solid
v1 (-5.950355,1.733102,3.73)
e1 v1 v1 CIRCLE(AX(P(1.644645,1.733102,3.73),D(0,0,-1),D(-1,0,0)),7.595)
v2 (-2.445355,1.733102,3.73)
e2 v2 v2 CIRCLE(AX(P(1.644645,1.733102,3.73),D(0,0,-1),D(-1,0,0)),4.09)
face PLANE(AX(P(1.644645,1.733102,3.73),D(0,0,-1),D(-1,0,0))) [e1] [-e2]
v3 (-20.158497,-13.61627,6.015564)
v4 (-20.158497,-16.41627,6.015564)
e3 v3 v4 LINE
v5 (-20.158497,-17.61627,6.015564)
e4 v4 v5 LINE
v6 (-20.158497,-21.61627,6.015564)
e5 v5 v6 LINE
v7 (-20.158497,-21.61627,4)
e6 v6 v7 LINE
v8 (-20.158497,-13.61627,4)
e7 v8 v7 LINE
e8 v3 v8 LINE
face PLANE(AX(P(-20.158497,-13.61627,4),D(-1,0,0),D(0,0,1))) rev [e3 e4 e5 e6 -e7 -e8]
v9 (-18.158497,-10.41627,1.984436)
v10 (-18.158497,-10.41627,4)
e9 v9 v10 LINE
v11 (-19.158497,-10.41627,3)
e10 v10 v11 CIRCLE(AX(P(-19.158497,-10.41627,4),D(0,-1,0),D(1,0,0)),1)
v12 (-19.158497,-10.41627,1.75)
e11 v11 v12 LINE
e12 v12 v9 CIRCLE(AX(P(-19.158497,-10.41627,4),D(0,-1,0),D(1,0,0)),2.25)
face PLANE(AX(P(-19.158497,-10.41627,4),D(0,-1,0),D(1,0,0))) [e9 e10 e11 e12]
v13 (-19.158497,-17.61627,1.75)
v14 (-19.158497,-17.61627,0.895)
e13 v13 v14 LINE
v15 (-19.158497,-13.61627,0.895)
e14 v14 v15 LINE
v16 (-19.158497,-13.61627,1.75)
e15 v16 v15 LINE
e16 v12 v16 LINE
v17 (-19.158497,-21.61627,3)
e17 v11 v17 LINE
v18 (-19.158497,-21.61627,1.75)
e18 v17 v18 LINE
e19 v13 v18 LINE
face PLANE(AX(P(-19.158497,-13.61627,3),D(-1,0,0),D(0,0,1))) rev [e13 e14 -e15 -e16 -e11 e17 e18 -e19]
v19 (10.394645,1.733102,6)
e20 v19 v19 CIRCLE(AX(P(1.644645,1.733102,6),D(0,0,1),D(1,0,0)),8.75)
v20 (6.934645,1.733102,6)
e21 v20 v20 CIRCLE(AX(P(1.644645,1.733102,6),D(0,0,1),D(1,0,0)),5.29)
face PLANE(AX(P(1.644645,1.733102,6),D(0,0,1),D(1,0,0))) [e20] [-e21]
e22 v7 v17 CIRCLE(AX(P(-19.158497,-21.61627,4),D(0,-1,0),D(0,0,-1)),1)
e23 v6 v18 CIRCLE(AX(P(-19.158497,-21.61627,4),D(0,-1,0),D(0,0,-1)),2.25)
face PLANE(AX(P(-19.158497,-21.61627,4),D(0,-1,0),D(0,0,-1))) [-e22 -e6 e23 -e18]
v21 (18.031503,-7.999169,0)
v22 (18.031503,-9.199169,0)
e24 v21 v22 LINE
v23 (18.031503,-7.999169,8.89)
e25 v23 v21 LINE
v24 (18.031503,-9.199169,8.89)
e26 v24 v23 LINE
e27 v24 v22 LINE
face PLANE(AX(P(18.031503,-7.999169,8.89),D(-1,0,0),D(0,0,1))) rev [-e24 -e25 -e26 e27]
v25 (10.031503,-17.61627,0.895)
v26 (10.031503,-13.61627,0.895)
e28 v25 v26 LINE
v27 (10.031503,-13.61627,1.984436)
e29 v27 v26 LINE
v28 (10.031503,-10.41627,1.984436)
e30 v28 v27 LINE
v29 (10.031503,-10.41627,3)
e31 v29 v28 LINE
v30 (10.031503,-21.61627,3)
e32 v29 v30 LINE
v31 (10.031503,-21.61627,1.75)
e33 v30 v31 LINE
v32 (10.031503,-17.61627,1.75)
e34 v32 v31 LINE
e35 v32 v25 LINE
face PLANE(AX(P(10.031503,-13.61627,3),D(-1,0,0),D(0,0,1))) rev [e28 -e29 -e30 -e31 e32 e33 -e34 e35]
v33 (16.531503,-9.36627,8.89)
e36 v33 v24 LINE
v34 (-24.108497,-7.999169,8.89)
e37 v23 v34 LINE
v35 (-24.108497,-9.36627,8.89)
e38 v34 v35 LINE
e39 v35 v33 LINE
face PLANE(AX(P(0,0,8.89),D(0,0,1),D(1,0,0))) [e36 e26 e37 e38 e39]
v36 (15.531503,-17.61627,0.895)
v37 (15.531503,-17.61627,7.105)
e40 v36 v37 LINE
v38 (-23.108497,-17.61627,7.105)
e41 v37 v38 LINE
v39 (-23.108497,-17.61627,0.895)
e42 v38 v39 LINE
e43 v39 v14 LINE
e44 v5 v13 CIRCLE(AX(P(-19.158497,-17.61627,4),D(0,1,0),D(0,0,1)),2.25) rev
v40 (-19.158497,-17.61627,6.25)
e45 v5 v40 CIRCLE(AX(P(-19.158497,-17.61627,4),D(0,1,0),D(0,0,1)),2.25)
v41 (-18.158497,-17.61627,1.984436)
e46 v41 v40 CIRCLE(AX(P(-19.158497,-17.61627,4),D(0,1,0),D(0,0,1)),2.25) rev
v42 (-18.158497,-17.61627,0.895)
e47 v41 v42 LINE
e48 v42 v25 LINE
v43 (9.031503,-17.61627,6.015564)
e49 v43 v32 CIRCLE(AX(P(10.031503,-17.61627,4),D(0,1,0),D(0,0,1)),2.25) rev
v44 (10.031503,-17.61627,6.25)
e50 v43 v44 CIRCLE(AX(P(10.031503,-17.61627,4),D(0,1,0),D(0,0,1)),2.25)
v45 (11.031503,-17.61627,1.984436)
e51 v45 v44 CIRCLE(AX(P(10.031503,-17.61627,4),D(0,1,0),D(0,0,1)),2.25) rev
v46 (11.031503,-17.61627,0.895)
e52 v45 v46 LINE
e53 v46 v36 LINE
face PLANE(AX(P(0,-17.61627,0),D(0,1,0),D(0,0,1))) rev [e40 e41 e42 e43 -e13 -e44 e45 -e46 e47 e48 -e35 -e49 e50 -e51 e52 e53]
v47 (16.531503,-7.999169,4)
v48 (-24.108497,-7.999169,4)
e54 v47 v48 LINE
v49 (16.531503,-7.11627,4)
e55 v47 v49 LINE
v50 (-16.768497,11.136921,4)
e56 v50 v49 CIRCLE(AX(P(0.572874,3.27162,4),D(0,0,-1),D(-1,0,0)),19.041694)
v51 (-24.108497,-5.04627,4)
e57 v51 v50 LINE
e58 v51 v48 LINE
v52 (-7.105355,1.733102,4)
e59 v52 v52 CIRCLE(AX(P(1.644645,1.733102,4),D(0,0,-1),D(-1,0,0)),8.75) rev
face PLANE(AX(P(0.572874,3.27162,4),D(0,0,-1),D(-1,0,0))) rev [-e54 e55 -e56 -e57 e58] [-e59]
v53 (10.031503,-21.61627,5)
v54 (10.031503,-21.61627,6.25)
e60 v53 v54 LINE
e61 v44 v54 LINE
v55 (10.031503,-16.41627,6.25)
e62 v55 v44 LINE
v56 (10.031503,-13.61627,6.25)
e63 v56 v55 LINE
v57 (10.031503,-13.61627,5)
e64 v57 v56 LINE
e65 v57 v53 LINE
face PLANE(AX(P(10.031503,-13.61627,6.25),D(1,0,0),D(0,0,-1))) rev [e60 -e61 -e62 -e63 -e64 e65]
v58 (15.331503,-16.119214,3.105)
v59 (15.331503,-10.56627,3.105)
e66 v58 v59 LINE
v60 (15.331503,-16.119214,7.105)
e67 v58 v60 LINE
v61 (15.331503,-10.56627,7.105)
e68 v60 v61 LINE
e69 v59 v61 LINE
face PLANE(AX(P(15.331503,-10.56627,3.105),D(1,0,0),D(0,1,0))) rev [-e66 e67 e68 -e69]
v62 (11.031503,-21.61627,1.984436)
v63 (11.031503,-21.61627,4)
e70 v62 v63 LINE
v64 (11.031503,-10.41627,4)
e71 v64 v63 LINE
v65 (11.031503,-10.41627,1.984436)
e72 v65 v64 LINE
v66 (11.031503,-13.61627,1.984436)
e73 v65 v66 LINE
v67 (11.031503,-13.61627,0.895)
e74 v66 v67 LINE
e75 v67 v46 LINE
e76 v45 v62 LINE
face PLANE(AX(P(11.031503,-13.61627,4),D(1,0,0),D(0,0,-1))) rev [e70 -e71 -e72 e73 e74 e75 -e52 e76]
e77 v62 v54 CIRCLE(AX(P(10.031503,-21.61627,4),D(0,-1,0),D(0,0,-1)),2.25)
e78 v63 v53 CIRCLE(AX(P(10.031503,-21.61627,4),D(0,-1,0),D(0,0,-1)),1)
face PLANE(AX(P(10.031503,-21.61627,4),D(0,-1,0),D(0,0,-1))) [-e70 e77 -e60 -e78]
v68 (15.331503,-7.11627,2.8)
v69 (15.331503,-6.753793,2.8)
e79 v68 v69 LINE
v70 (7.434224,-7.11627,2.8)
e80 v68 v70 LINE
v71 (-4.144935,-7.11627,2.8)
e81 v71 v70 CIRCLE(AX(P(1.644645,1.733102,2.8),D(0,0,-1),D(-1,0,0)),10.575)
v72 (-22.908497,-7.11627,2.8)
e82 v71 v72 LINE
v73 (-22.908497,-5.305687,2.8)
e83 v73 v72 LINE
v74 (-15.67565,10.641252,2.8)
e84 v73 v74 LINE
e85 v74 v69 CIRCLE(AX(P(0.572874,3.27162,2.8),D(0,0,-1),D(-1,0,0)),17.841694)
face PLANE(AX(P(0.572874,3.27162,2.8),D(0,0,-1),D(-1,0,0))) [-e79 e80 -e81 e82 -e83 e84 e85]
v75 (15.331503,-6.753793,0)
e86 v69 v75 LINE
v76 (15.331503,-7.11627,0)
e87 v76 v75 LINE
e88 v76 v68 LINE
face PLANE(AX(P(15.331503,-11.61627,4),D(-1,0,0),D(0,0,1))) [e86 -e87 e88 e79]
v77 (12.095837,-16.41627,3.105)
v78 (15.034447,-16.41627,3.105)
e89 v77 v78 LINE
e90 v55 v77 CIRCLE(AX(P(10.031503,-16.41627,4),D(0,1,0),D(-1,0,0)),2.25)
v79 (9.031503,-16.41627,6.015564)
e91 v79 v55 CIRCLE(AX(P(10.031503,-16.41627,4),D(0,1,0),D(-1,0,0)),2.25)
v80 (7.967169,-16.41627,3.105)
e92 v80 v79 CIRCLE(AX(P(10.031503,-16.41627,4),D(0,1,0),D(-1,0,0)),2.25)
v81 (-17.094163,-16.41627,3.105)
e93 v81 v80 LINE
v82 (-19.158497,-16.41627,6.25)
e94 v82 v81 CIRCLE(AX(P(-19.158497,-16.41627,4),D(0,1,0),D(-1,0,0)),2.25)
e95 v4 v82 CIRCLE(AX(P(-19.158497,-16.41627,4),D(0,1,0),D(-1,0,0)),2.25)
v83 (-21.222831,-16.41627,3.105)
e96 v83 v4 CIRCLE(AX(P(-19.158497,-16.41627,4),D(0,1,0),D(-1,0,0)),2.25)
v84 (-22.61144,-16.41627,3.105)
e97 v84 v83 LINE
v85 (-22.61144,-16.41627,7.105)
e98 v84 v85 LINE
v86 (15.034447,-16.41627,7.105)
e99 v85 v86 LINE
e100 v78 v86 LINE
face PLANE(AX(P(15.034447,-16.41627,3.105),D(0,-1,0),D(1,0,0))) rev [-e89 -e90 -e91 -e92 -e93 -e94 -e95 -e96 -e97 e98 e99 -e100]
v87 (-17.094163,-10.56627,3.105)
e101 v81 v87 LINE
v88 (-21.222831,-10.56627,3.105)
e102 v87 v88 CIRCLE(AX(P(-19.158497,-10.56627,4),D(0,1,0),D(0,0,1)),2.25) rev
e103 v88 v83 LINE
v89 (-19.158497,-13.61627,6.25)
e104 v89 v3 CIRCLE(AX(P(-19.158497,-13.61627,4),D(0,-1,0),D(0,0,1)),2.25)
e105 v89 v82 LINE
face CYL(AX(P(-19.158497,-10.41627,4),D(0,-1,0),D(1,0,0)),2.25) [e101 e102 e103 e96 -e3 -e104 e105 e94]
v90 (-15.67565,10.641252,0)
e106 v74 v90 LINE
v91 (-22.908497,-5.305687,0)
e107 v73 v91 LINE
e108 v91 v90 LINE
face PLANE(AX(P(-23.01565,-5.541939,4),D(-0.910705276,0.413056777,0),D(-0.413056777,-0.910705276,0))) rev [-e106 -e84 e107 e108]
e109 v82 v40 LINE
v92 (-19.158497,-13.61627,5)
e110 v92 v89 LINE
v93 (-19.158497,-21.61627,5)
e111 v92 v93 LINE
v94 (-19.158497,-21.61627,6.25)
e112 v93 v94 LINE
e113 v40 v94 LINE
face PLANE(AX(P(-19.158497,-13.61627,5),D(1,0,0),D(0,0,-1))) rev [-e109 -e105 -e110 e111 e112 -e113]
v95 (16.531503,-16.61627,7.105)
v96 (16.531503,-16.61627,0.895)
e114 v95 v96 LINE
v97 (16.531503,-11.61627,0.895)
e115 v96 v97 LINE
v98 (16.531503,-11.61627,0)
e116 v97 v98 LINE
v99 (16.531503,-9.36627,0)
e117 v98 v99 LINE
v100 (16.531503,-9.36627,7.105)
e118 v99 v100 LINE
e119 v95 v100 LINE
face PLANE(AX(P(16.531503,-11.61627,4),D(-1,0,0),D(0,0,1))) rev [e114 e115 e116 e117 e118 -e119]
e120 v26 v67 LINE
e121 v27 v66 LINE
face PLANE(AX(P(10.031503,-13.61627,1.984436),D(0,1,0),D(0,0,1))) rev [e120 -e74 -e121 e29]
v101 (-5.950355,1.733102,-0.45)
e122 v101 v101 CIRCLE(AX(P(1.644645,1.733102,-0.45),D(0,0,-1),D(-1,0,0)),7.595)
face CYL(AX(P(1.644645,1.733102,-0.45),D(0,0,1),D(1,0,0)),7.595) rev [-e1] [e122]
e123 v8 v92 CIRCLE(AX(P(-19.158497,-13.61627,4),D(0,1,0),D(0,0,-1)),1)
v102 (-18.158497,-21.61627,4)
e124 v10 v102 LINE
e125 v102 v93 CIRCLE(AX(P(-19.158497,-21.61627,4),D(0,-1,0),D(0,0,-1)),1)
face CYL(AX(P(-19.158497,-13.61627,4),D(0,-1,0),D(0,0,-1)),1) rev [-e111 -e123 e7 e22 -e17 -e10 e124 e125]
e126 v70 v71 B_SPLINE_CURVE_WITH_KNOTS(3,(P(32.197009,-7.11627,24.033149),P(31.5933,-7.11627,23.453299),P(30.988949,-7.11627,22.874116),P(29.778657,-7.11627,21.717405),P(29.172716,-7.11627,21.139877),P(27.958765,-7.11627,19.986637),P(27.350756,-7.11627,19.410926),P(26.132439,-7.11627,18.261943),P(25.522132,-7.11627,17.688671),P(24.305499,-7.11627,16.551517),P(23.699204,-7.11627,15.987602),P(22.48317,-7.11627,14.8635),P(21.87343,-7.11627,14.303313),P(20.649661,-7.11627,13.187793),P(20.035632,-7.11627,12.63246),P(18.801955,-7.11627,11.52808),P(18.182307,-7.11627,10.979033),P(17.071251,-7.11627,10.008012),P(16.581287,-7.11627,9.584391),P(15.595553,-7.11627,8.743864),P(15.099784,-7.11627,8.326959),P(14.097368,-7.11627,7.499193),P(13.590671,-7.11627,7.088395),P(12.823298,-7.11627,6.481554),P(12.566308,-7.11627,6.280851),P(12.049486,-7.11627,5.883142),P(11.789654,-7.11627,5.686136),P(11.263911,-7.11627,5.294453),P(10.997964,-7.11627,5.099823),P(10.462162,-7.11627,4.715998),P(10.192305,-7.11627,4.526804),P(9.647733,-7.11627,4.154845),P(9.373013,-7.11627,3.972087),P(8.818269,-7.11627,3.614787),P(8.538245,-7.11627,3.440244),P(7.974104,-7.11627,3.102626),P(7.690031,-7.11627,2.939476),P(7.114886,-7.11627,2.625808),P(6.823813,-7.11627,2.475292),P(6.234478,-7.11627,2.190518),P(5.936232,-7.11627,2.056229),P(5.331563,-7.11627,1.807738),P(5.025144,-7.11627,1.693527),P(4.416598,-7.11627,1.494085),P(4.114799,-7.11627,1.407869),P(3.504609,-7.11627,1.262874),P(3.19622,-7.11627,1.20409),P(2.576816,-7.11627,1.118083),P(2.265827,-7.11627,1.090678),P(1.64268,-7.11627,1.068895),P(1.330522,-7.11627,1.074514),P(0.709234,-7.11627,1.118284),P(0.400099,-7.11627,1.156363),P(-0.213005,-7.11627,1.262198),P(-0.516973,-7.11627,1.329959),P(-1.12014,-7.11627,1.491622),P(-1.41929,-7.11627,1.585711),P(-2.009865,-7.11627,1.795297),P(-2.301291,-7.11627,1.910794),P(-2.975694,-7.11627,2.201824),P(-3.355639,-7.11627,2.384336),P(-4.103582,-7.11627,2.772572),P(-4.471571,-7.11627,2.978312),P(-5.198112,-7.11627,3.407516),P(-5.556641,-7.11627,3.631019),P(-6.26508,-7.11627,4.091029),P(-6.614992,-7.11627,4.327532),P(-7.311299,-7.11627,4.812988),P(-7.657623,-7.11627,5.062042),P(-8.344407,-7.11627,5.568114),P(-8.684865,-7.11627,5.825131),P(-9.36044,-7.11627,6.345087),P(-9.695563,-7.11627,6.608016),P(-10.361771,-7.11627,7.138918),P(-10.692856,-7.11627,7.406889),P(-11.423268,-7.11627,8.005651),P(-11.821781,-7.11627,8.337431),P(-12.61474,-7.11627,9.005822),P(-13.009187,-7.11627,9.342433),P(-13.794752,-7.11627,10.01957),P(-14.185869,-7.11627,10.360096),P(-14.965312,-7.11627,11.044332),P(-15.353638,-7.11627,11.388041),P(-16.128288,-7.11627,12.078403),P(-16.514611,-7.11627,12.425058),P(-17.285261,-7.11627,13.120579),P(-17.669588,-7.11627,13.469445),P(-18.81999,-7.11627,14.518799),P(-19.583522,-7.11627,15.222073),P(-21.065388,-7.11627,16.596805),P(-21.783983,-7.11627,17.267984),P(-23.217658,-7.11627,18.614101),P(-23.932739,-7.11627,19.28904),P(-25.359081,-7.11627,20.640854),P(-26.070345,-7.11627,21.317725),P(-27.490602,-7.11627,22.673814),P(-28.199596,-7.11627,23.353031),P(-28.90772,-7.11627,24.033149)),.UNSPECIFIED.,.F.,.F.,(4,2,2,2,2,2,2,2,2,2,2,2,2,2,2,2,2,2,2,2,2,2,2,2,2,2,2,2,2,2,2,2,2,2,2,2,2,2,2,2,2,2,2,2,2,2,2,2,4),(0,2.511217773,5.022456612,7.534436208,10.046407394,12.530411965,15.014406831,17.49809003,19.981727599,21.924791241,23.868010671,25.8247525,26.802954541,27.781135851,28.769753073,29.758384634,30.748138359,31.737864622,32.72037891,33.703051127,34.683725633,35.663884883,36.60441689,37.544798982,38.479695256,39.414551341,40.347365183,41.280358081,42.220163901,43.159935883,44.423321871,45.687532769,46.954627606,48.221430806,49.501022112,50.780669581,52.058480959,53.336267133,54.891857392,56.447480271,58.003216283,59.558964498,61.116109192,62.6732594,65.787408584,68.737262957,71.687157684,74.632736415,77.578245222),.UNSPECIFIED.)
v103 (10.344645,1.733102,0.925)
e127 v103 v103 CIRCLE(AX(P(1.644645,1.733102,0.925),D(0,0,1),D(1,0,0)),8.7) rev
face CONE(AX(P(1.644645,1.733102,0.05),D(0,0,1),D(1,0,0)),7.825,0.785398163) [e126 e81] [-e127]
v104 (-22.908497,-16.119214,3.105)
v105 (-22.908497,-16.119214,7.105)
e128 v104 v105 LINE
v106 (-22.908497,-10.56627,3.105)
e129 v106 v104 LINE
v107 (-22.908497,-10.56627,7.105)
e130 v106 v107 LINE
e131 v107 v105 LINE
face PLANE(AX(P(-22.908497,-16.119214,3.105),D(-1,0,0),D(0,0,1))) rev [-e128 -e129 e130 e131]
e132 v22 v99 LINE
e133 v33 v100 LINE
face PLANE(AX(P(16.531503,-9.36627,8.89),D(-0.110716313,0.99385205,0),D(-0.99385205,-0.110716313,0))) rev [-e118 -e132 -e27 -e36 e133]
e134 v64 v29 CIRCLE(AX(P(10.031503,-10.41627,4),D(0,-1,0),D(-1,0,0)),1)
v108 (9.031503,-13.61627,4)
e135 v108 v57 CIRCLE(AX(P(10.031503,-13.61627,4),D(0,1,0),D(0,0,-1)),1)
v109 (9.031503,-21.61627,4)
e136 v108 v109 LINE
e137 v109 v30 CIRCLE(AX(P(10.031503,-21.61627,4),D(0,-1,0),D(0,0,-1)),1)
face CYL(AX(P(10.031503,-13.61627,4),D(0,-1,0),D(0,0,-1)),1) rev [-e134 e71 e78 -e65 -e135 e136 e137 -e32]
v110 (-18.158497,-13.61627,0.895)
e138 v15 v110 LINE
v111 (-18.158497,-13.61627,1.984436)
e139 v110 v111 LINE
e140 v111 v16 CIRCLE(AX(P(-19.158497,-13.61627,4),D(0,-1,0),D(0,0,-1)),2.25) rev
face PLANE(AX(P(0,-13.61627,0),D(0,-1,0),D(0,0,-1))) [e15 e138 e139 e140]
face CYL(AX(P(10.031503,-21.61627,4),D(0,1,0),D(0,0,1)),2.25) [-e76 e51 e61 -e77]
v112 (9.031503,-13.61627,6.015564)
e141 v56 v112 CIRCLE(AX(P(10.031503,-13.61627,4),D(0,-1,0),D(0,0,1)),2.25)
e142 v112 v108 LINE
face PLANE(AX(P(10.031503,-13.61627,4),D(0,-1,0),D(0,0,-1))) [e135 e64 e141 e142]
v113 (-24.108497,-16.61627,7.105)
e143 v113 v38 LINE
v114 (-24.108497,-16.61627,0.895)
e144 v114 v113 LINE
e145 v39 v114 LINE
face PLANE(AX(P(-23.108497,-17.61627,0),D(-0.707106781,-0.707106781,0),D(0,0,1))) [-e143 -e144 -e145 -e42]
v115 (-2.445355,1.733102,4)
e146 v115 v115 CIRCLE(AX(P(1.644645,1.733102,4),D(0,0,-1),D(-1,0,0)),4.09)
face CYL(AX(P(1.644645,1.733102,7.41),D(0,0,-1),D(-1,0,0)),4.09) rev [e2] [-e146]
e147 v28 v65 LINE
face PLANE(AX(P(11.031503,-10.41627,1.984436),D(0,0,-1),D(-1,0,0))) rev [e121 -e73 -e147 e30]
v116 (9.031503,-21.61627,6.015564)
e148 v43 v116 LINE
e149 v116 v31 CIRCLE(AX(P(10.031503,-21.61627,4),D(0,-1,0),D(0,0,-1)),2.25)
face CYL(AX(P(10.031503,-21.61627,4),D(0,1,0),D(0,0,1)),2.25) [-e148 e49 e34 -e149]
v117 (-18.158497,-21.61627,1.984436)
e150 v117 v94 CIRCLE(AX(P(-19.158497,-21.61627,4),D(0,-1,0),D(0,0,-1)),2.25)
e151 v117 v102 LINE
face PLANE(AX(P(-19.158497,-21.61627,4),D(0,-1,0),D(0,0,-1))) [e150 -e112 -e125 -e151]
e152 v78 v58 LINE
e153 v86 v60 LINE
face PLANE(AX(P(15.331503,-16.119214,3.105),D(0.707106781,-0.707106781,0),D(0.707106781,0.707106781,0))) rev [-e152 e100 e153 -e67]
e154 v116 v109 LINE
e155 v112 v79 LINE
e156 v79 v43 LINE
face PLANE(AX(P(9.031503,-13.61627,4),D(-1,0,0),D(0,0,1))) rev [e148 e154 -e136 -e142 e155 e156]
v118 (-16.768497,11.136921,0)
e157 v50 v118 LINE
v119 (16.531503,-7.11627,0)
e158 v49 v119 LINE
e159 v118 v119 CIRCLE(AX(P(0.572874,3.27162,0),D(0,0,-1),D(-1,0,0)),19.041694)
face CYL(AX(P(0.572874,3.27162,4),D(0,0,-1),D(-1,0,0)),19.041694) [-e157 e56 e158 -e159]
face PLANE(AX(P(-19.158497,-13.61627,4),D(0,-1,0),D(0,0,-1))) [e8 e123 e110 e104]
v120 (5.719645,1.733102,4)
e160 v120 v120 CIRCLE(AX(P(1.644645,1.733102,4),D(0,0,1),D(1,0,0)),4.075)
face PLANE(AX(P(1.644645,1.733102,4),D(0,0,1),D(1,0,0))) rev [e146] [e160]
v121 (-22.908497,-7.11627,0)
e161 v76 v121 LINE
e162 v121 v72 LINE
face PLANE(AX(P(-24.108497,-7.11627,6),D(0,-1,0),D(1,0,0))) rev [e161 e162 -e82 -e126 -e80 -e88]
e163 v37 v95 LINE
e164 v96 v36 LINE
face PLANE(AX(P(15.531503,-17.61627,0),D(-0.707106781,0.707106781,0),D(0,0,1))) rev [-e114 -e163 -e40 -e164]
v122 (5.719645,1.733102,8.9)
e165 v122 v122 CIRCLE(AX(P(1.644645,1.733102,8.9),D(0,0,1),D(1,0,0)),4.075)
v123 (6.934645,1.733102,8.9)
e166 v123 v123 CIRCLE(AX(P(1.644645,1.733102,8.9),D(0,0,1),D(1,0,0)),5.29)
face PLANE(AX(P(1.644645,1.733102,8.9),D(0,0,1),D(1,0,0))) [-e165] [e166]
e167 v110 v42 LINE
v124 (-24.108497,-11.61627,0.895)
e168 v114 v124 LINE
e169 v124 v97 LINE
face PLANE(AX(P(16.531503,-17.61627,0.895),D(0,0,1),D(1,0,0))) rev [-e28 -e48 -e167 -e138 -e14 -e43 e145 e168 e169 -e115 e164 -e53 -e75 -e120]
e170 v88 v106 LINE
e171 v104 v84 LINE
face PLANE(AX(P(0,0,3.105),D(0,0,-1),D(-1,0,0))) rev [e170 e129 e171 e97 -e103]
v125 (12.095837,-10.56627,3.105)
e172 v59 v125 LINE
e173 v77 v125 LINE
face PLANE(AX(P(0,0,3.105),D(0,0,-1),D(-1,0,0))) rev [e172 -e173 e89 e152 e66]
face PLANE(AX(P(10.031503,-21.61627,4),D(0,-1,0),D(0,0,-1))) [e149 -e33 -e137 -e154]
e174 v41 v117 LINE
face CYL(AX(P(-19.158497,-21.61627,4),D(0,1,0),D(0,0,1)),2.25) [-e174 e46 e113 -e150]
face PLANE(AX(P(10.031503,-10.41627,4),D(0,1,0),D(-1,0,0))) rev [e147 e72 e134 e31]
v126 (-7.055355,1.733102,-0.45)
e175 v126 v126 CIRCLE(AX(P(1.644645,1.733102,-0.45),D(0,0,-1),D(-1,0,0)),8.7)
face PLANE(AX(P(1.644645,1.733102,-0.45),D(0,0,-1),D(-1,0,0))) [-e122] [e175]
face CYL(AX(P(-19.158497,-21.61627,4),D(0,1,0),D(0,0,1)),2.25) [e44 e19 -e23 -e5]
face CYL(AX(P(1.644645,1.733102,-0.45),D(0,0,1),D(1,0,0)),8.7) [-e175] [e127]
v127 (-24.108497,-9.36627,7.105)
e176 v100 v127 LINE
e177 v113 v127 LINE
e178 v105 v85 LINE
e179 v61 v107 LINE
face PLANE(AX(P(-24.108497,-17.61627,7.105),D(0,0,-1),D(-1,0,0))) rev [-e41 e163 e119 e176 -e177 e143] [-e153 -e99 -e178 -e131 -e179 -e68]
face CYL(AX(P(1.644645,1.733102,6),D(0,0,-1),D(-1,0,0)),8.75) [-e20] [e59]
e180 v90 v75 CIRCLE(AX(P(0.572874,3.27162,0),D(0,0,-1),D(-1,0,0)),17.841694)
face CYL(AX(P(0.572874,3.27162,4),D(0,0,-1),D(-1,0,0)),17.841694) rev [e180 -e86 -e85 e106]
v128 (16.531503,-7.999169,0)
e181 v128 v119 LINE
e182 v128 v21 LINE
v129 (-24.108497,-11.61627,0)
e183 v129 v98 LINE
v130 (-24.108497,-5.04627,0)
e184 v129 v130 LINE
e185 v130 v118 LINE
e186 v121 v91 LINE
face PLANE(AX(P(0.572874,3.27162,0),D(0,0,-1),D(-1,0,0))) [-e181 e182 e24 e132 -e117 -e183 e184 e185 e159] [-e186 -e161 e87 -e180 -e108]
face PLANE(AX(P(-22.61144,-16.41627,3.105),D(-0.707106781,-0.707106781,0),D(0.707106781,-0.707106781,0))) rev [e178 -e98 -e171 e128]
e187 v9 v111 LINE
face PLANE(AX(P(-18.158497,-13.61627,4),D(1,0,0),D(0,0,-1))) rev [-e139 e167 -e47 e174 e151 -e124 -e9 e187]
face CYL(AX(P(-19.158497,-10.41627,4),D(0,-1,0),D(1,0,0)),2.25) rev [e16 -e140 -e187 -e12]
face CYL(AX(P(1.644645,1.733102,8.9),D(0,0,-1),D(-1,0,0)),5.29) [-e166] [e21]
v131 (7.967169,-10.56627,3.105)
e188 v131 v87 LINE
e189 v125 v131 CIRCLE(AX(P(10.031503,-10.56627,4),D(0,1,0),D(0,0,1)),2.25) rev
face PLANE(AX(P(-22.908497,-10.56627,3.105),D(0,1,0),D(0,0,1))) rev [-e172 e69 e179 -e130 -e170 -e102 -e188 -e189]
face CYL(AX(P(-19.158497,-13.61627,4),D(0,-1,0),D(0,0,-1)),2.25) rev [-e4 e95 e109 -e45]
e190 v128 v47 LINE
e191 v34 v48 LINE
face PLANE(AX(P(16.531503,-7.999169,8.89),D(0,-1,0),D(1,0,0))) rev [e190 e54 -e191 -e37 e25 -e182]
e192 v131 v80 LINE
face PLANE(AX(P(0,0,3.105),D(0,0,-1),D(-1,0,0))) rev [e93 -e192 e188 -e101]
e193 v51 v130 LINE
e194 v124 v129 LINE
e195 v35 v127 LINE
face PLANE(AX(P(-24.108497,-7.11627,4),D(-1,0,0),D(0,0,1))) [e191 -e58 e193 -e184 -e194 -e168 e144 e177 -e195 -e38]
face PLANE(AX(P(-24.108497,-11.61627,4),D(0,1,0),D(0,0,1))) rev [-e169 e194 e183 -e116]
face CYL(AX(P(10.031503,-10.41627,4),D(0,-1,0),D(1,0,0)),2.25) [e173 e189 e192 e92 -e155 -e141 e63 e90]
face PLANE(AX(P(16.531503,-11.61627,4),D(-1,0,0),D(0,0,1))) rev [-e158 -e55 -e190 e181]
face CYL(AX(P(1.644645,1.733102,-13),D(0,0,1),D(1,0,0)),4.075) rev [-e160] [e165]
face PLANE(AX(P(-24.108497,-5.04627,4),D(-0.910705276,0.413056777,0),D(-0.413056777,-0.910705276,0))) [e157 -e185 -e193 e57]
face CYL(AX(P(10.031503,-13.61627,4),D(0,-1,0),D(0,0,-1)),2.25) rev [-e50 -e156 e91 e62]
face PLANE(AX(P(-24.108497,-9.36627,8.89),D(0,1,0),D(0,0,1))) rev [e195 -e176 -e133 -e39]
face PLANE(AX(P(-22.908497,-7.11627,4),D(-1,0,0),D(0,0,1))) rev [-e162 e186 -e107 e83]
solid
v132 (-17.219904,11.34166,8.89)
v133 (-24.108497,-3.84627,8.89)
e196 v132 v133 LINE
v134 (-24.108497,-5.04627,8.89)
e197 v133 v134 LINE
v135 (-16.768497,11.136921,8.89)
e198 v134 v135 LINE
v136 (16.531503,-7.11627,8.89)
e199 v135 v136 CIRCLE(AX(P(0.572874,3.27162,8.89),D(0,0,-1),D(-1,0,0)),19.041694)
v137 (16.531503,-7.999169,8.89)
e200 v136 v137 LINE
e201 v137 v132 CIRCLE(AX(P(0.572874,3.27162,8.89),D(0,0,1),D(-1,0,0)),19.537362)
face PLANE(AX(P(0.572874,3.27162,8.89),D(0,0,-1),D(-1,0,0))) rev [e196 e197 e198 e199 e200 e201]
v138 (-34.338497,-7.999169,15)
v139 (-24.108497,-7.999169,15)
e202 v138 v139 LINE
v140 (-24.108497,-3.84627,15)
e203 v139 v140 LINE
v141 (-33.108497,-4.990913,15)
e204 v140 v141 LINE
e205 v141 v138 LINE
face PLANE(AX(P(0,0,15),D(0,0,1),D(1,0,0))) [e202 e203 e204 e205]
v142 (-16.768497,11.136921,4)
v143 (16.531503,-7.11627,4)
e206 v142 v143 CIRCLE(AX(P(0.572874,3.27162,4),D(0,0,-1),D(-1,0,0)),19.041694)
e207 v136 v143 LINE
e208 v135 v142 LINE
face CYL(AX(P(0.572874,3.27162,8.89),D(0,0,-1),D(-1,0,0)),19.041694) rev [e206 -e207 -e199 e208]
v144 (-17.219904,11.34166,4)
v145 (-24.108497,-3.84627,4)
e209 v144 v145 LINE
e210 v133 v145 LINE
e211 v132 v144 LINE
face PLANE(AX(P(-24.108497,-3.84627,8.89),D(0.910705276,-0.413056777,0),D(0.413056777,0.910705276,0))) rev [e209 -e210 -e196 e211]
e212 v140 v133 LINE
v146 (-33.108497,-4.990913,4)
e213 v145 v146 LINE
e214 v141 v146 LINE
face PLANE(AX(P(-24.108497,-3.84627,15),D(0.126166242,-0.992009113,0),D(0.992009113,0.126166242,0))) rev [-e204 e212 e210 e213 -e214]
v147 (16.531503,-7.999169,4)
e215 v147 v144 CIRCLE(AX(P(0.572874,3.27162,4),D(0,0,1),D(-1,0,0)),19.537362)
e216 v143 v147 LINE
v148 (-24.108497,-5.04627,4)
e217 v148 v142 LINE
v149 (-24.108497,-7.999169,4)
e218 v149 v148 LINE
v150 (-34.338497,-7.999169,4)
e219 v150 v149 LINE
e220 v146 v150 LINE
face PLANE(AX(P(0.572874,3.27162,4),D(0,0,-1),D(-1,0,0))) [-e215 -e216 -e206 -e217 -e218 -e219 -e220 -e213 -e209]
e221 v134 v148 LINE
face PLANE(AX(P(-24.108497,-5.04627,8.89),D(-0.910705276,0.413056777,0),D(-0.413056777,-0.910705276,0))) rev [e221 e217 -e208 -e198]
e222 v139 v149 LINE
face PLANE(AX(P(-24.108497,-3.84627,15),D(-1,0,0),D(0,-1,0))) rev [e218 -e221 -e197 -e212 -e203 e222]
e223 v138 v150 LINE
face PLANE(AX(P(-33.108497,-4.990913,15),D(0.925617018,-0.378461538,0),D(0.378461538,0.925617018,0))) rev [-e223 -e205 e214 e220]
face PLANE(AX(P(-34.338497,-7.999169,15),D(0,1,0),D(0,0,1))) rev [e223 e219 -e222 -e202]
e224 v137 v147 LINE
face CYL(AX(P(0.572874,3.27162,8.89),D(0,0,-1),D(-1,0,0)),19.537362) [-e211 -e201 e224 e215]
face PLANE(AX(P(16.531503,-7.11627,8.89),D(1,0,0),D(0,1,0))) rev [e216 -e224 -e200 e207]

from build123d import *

# Parameters (mm, degrees)
BOSS_EXTRUDE1_DEPTH  = 4
SHELL1_T             = -1.2
SKETCH3_R            = 10.575
BOSS_EXTRUDE2_DEPTH  = 2.75
SKETCH4_R            = 8.7
SKETCH4_R_2          = 7.595
BOSS_EXTRUDE3_DEPTH  = 0.5
CHAMFER1_SIZE        = 2.75
CUT_EXTRUDE2_START   = -3.68
SKETCH5_R            = 7.595
CUT_EXTRUDE2_DEPTH   = 3.68
SKETCH6_R            = 4.09
CUT_EXTRUDE3_DEPTH   = 3.68
SKETCH7_W            = 40.64
SKETCH7_H            = 4.5
BOSS_EXTRUDE5_DEPTH  = 6
SKETCH18_W           = 40.64
SKETCH18_H           = 4.5
CUT_EXTRUDE10_DEPTH  = 2
BOSS_EXTRUDE16_DEPTH = 4.89
SKETCH20_W           = 40.64
SKETCH20_H           = 1.367101803
BOSS_EXTRUDE17_DEPTH = 4.89
BOSS_EXTRUDE18_DEPTH = 4.89
BOSS_EXTRUDE19_DEPTH = 4
BOSS_EXTRUDE24_DEPTH = 11
SKETCH31_W           = 40.64
SKETCH31_H           = 6.21
BOSS_EXTRUDE32_DEPTH = 6
CHAMFER2_SIZE        = 1
CHAMFER3_SIZE        = 1
SKETCH32_R           = 2.25
BOSS_EXTRUDE33_DEPTH = 4
SKETCH33_R           = 2.25
BOSS_EXTRUDE34_DEPTH = 4
SKETCH34_R           = 1
CUT_EXTRUDE14_DEPTH  = 8
CUT_EXTRUDE16_DEPTH  = 8
SKETCH37_R           = 1
CUT_EXTRUDE17_DEPTH  = 8
CUT_EXTRUDE19_DEPTH  = 8
SKETCH42_R           = 5.29
BOSS_EXTRUDE36_DEPTH = 4.9
SKETCH47_R           = 4.075
CUT_EXTRUDE21_DEPTH  = 21.9
SKETCH55_W           = 40.64
SKETCH55_H           = 3.105
BOSS_EXTRUDE47_DEPTH = 2.25
SKETCH59_W           = 1
SKETCH59_H           = 4
CUT_EXTRUDE29_DEPTH  = 1.08944
CUT_EXTRUDE35_DEPTH  = 4
BOSS_EXTRUDE54_START = 6
SKETCH70_R           = 2.25
BOSS_EXTRUDE54_DEPTH = 6
SKETCH66_R           = 8.75
BOSS_EXTRUDE66_DEPTH = 2
SKETCH71_R           = 2.25
BOSS_EXTRUDE71_DEPTH = 6
CUT_EXTRUDE39_DEPTH  = 8
CUT_EXTRUDE40_START  = -8
CUT_EXTRUDE40_DEPTH  = 8
SKETCH73_W           = 1
SKETCH73_H           = 4
CUT_EXTRUDE41_DEPTH  = 1.089436
CUT_EXTRUDE42_DEPTH  = 6
CUT_EXTRUDE43_START  = -6
CUT_EXTRUDE43_DEPTH  = 6
SKETCH79_R           = 4.075
CUT_EXTRUDE47_DEPTH  = 7


with BuildPart() as part:
    # Sketch1 → Boss-Extrude1 (new body)
    with BuildSketch(Plane.XY):
        with BuildLine():
            Line((-24.108496543, -7.116270468), (-24.108496543, -5.046270468))
            Line((-24.108496543, -5.046270468), (-16.768496543, 11.136920555))
            ThreePointArc((-16.768496543, 11.136920555), (9.72561941, 19.969325243), (16.531503457, -7.116270468))
            Line((16.531503457, -7.116270468), (16.531503457, -11.616270468))
            Line((16.531503457, -11.616270468), (-24.108496543, -11.616270468))
            Line((-24.108496543, -11.616270468), (-24.108496543, -7.116270468))
        make_face()
    extrude(amount=BOSS_EXTRUDE1_DEPTH)

    # Shell1
    shell1_openings = [part.faces().sort_by_distance(p)[0] for p in [
        (-1.110099133, 3.328032684, 0),
    ]]
    offset(amount=SHELL1_T, openings=shell1_openings, kind=Kind.INTERSECTION)

    # Sketch3 → Boss-Extrude2 (add)
    with BuildSketch(Plane(origin=(0, 0, 2.8), x_dir=(-1, 0, 0), z_dir=(0, 0, -1))):
        with Locations((-1.644644565, 1.733101785)):
            Circle(SKETCH3_R)
    extrude(amount=BOSS_EXTRUDE2_DEPTH)

    # Sketch4 → Boss-Extrude3 (add)
    with BuildSketch(Plane(origin=(0, 0, 0.05), x_dir=(-1, 0, 0), z_dir=(0, 0, -1))):
        with Locations((-1.644644565, 1.733101785)):
            Circle(SKETCH4_R)
        with Locations((-1.644644565, 1.733101785)):
            Circle(SKETCH4_R_2, mode=Mode.SUBTRACT)
    extrude(amount=BOSS_EXTRUDE3_DEPTH)

    # Chamfer1
    # the kernel refuses this chamfer: 2.75 mm, written as the material it takes off along each edge
    with BuildSketch(Plane(origin=(1.644644565, 1.733101785, 0.05), x_dir=(-1, 0, 0), z_dir=(0, -1, 0))) as chamfer1_piece_1_section:
        Polygon((10.575, -CHAMFER1_SIZE), (10.575 - CHAMFER1_SIZE, 0), (10.575, 0), align=None)
    chamfer1_piece_1 = revolve(axis=Axis((1.644644565, 1.733101785, 0.05), (0, 0, -1)), mode=Mode.PRIVATE)
    chamfer1_piece_1 = split(chamfer1_piece_1, bisect_by=Plane(origin=(11.325301981, 1.733101785, 2.8), z_dir=(0, 0, -1)), keep=Keep.TOP, mode=Mode.PRIVATE)
    chamfer1_piece_1 = chamfer1_piece_1 - Plane(origin=(1.644644565, 1.733101785, 1.819342584), x_dir=(-1, 0, 0), z_dir=(0, 0, 1)) * Cylinder(8.7, 43, mode=Mode.PRIVATE)
    add(chamfer1_piece_1, mode=Mode.SUBTRACT)

    # Sketch5 → Cut-Extrude2 (cut)
    with BuildSketch(Plane(origin=(0, 0, 0.05), x_dir=(-1, 0, 0), z_dir=(0, 0, -1)).offset(CUT_EXTRUDE2_START)):
        with Locations((-1.644644565, 1.733101785)):
            Circle(SKETCH5_R)
    extrude(amount=CUT_EXTRUDE2_DEPTH, mode=Mode.SUBTRACT)

    # Sketch6 → Cut-Extrude3 (cut)
    with BuildSketch(Plane(origin=(0, 0, 3.73), x_dir=(-1, 0, 0), z_dir=(0, 0, -1))):
        with Locations((-1.644644565, 1.733101785)):
            Circle(SKETCH6_R)
    extrude(amount=-CUT_EXTRUDE3_DEPTH, mode=Mode.SUBTRACT)

    # Sketch7 → Boss-Extrude5 (add)
    with BuildSketch(Plane.XY):
        with Locations((-3.788496543, -9.366270468)):
            Rectangle(SKETCH7_W, SKETCH7_H)
    extrude(amount=BOSS_EXTRUDE5_DEPTH)

    # Sketch18 → Cut-Extrude10 (cut)
    with BuildSketch(Plane.XY.offset(6)):
        with Locations((-3.788496543, -9.366270468)):
            Rectangle(SKETCH18_W, SKETCH18_H)
    extrude(amount=-CUT_EXTRUDE10_DEPTH, mode=Mode.SUBTRACT)

    # Sketch20 → Boss-Extrude17 (add)
    with BuildSketch(Plane.XY.offset(4)):
        with Locations((-3.788496543, -8.682719567)):
            Rectangle(SKETCH20_W, SKETCH20_H)
    extrude(amount=BOSS_EXTRUDE17_DEPTH)

    # Sketch21 → Boss-Extrude18 (add)
    with BuildSketch(Plane.XY.offset(4)):
        Polygon((16.531503457, -7.999168665), (18.031503457, -7.999168665), (18.031503457, -9.199168665), (16.531503457, -9.366270468), align=None)
    extrude(amount=BOSS_EXTRUDE18_DEPTH)

    # Sketch22 → Boss-Extrude19 (add)
    with BuildSketch(Plane(origin=(0, 0, 4), x_dir=(-1, 0, 0), z_dir=(0, 0, -1))):
        Polygon((-16.531503457, -7.999168665), (-18.031503457, -7.999168665), (-18.031503457, -9.199168665), (-16.531503457, -9.366270468), align=None)
    extrude(amount=BOSS_EXTRUDE19_DEPTH)

    # Sketch31 → Boss-Extrude32 (add)
    with BuildSketch(Plane.XZ.offset(11.616270468)):
        with Locations((-3.788496543, 4)):
            Rectangle(SKETCH31_W, SKETCH31_H)
    extrude(amount=BOSS_EXTRUDE32_DEPTH)

    # Chamfer2
    chamfer2_edges = [part.edges().sort_by_distance(p)[0] for p in [
        (-24.108496543, -17.616270468, 4),
    ]]
    chamfer(chamfer2_edges, length=CHAMFER2_SIZE)

    # Chamfer3
    chamfer3_edges = [part.edges().sort_by_distance(p)[0] for p in [
        (16.531503457, -17.616270468, 4),
    ]]
    chamfer(chamfer3_edges, length=CHAMFER3_SIZE)

    # Sketch32 → Boss-Extrude33 (add)
    with BuildSketch(Plane.XZ.offset(17.616270468)):
        with Locations(Location((-19.158496543, 4, 0), (0, 0, 90))):
            Circle(SKETCH32_R)
    extrude(amount=BOSS_EXTRUDE33_DEPTH)

    # Sketch33 → Boss-Extrude34 (add)
    with BuildSketch(Plane.XZ.offset(17.616270468)):
        with Locations(Location((10.031503457, 4, 0), (0, 0, 90))):
            Circle(SKETCH33_R)
    extrude(amount=BOSS_EXTRUDE34_DEPTH)

    # Sketch34 → Cut-Extrude14 (cut)
    with BuildSketch(Plane.XZ.offset(21.616270468)):
        with Locations(Location((-19.158496543, 4, 0), (0, 0, 270))):
            Circle(SKETCH34_R)
    extrude(amount=-CUT_EXTRUDE14_DEPTH, mode=Mode.SUBTRACT)

    # Sketch36 → Cut-Extrude16 (cut)
    with BuildSketch(Plane(origin=(0, -21.616270468, 0), x_dir=(-1, 0, 0), z_dir=(0, -1, 0))):
        with BuildLine():
            Line((18.158496543, -4), (18.158496543, -1.984435563))
            ThreePointArc((18.158496543, -1.984435563), (18.644940306, -1.80939278), (19.158496543, -1.75))
            Line((19.158496543, -1.75), (19.158496543, -3))
            ThreePointArc((19.158496543, -3), (18.451389761, -3.292893219), (18.158496543, -4))
        make_face()
    extrude(amount=-CUT_EXTRUDE16_DEPTH, mode=Mode.SUBTRACT)

    # Sketch37 → Cut-Extrude17 (cut)
    with BuildSketch(Plane.XZ.offset(21.616270468)):
        with Locations(Location((10.031503457, 4, 0), (0, 0, 270))):
            Circle(SKETCH37_R)
    extrude(amount=-CUT_EXTRUDE17_DEPTH, mode=Mode.SUBTRACT)

    # Sketch39 → Cut-Extrude19 (cut)
    with BuildSketch(Plane(origin=(0, -21.616270468, 0), x_dir=(-1, 0, 0), z_dir=(0, -1, 0))):
        with BuildLine():
            Line((-11.031503457, -4), (-11.031503457, -1.984435563))
            ThreePointArc((-11.031503457, -1.984435563), (-10.545059694, -1.80939278), (-10.031503457, -1.75))
            Line((-10.031503457, -1.75), (-10.031503457, -3))
            ThreePointArc((-10.031503457, -3), (-10.738610239, -3.292893219), (-11.031503457, -4))
        make_face()
    extrude(amount=-CUT_EXTRUDE19_DEPTH, mode=Mode.SUBTRACT)

    # Sketch42 → Boss-Extrude36 (add)
    with BuildSketch(Plane.XY.offset(4)):
        with Locations(Location((1.644644565, 1.733101785, 0), (0, 0, 180))):
            Circle(SKETCH42_R)
    extrude(amount=BOSS_EXTRUDE36_DEPTH)

    # Sketch47 → Cut-Extrude21 (cut)
    with BuildSketch(Plane.XY.offset(8.9)):
        with Locations((1.644644565, 1.733101785)):
            Circle(SKETCH47_R)
    extrude(amount=-CUT_EXTRUDE21_DEPTH, mode=Mode.SUBTRACT)

    # Sketch55 → Boss-Extrude47 (add)
    with BuildSketch(Plane(origin=(0, -11.616270468, 0), x_dir=(1, 0, 0), z_dir=(0, 1, 0))):
        with Locations((-3.788496543, -5.5525)):
            Rectangle(SKETCH55_W, SKETCH55_H)
    extrude(amount=BOSS_EXTRUDE47_DEPTH)

    # Sketch59 → Cut-Extrude29 (cut)
    with BuildSketch(Plane(origin=(0, 0, 0.895), x_dir=(-1, 0, 0), z_dir=(0, 0, -1))):
        with Locations((18.658496543, -15.616270468)):
            Rectangle(SKETCH59_W, SKETCH59_H)
    extrude(amount=-CUT_EXTRUDE29_DEPTH, mode=Mode.SUBTRACT)

    # Sketch68 → Cut-Extrude35 (cut)
    with BuildSketch(Plane.XY.offset(7.105)):
        Polygon((-22.908496543, -10.566270468), (15.331503457, -10.566270468), (15.331503457, -16.119214193), (15.034447183, -16.416270468), (-22.611440268, -16.416270468), (-22.908496543, -16.119214193), align=None)
    extrude(amount=-CUT_EXTRUDE35_DEPTH, mode=Mode.SUBTRACT)

    # Sketch70 → Boss-Extrude54 (add)
    with BuildSketch(Plane(origin=(0, -16.416270468, 0), x_dir=(1, 0, 0), z_dir=(0, 1, 0)).offset(BOSS_EXTRUDE54_START)):
        with Locations((-19.158496543, -4)):
            Circle(SKETCH70_R)
    extrude(amount=-BOSS_EXTRUDE54_DEPTH)

    # Sketch66 → Boss-Extrude66 (add)
    with BuildSketch(Plane.XY.offset(4)):
        with Locations(Location((1.644644565, 1.733101785, 0), (0, 0, 180))):
            Circle(SKETCH66_R)
    extrude(amount=BOSS_EXTRUDE66_DEPTH)

    # Sketch71 → Boss-Extrude71 (add)
    with BuildSketch(Plane(origin=(0, -16.416270468, 0), x_dir=(1, 0, 0), z_dir=(0, 1, 0))):
        with Locations((10.031503457, -4)):
            Circle(SKETCH71_R)
    extrude(amount=BOSS_EXTRUDE71_DEPTH)

    # Sketch38 → Cut-Extrude39 (cut)
    with BuildSketch(Plane(origin=(0, -21.616270468, 0), x_dir=(-1, 0, 0), z_dir=(0, -1, 0))):
        with BuildLine():
            Line((-9.031503457, -4), (-9.031503457, -6.015564437))
            ThreePointArc((-9.031503457, -6.015564437), (-9.517947221, -6.19060722), (-10.031503457, -6.25))
            Line((-10.031503457, -6.25), (-10.031503457, -5))
            ThreePointArc((-10.031503457, -5), (-9.324396676, -4.707106781), (-9.031503457, -4))
        make_face()
    extrude(amount=-CUT_EXTRUDE39_DEPTH, mode=Mode.SUBTRACT)

    # Sketch69 → Cut-Extrude40 (cut)
    with BuildSketch(Plane.XZ.offset(21.616270468).offset(CUT_EXTRUDE40_START)):
        with BuildLine():
            Line((-20.158496543, 4), (-20.158496543, 6.015564437))
            ThreePointArc((-20.158496543, 6.015564437), (-19.672052779, 6.19060722), (-19.158496543, 6.25))
            Line((-19.158496543, 6.25), (-19.158496543, 5))
            ThreePointArc((-19.158496543, 5), (-19.865603324, 4.707106781), (-20.158496543, 4))
        make_face()
    extrude(amount=CUT_EXTRUDE40_DEPTH, mode=Mode.SUBTRACT)

    # Sketch73 → Cut-Extrude41 (cut)
    with BuildSketch(Plane(origin=(0, 0, 0.895), x_dir=(-1, 0, 0), z_dir=(0, 0, -1))):
        with Locations((-10.531503457, -15.616270468)):
            Rectangle(SKETCH73_W, SKETCH73_H)
    extrude(amount=-CUT_EXTRUDE41_DEPTH, mode=Mode.SUBTRACT)

    # Sketch74 → Cut-Extrude42 (cut)
    with BuildSketch(Plane.XZ.offset(16.416270468)):
        with BuildLine():
            Line((11.031503457, 1.984435563), (10.031503457, 1.984435563))
            Line((10.031503457, 1.984435563), (10.031503457, 3))
            ThreePointArc((10.031503457, 3), (9.324396676, 4.707106781), (11.031503457, 4))
            Line((11.031503457, 4), (11.031503457, 1.984435563))
        make_face()
    extrude(amount=-CUT_EXTRUDE42_DEPTH, mode=Mode.SUBTRACT)

    # Sketch75 → Cut-Extrude43 (cut)
    with BuildSketch(Plane.XZ.offset(16.416270468).offset(CUT_EXTRUDE43_START)):
        with BuildLine():
            Line((-18.158496543, 1.984435563), (-18.158496543, 4))
            ThreePointArc((-18.158496543, 4), (-19.865603324, 4.707106781), (-19.158496543, 3))
            Line((-19.158496543, 3), (-19.158496543, 1.75))
            ThreePointArc((-19.158496543, 1.75), (-18.644940306, 1.80939278), (-18.158496543, 1.984435563))
        make_face()
    extrude(amount=CUT_EXTRUDE43_DEPTH, mode=Mode.SUBTRACT)

    # Sketch79 → Cut-Extrude47 (cut)
    with BuildSketch(Plane.XY.offset(6)):
        with Locations((1.644644565, 1.733101785)):
            Circle(SKETCH79_R)
    extrude(amount=-CUT_EXTRUDE47_DEPTH, mode=Mode.SUBTRACT)


with BuildPart() as body_2:
    # Sketch19 → Boss-Extrude16 (new body)
    with BuildSketch(Plane.XY.offset(4)):
        with BuildLine():
            Line((-24.108496543, -5.046270468), (-24.108496543, -3.846270468))
            Line((-24.108496543, -3.846270468), (-17.219904126, 11.341659636))
            ThreePointArc((-17.219904126, 11.341659636), (10.286675812, 20.223038003), (16.531503457, -7.999168665))
            Line((16.531503457, -7.999168665), (16.531503457, -7.116270468))
            ThreePointArc((16.531503457, -7.116270468), (9.72561941, 19.969325243), (-16.768496543, 11.136920555))
            Line((-16.768496543, 11.136920555), (-24.108496543, -5.046270468))
        make_face()
    extrude(amount=BOSS_EXTRUDE16_DEPTH)

    # Sketch23 → Boss-Extrude24 (add)
    with BuildSketch(Plane.XY.offset(4)):
        Polygon((-24.108496543, -3.846270468), (-24.108496543, -7.999168665), (-34.338496543, -7.999168665), (-33.108496543, -4.990913357), align=None)
    extrude(amount=BOSS_EXTRUDE24_DEPTH)


solid = Compound([part.part, body_2.part])
